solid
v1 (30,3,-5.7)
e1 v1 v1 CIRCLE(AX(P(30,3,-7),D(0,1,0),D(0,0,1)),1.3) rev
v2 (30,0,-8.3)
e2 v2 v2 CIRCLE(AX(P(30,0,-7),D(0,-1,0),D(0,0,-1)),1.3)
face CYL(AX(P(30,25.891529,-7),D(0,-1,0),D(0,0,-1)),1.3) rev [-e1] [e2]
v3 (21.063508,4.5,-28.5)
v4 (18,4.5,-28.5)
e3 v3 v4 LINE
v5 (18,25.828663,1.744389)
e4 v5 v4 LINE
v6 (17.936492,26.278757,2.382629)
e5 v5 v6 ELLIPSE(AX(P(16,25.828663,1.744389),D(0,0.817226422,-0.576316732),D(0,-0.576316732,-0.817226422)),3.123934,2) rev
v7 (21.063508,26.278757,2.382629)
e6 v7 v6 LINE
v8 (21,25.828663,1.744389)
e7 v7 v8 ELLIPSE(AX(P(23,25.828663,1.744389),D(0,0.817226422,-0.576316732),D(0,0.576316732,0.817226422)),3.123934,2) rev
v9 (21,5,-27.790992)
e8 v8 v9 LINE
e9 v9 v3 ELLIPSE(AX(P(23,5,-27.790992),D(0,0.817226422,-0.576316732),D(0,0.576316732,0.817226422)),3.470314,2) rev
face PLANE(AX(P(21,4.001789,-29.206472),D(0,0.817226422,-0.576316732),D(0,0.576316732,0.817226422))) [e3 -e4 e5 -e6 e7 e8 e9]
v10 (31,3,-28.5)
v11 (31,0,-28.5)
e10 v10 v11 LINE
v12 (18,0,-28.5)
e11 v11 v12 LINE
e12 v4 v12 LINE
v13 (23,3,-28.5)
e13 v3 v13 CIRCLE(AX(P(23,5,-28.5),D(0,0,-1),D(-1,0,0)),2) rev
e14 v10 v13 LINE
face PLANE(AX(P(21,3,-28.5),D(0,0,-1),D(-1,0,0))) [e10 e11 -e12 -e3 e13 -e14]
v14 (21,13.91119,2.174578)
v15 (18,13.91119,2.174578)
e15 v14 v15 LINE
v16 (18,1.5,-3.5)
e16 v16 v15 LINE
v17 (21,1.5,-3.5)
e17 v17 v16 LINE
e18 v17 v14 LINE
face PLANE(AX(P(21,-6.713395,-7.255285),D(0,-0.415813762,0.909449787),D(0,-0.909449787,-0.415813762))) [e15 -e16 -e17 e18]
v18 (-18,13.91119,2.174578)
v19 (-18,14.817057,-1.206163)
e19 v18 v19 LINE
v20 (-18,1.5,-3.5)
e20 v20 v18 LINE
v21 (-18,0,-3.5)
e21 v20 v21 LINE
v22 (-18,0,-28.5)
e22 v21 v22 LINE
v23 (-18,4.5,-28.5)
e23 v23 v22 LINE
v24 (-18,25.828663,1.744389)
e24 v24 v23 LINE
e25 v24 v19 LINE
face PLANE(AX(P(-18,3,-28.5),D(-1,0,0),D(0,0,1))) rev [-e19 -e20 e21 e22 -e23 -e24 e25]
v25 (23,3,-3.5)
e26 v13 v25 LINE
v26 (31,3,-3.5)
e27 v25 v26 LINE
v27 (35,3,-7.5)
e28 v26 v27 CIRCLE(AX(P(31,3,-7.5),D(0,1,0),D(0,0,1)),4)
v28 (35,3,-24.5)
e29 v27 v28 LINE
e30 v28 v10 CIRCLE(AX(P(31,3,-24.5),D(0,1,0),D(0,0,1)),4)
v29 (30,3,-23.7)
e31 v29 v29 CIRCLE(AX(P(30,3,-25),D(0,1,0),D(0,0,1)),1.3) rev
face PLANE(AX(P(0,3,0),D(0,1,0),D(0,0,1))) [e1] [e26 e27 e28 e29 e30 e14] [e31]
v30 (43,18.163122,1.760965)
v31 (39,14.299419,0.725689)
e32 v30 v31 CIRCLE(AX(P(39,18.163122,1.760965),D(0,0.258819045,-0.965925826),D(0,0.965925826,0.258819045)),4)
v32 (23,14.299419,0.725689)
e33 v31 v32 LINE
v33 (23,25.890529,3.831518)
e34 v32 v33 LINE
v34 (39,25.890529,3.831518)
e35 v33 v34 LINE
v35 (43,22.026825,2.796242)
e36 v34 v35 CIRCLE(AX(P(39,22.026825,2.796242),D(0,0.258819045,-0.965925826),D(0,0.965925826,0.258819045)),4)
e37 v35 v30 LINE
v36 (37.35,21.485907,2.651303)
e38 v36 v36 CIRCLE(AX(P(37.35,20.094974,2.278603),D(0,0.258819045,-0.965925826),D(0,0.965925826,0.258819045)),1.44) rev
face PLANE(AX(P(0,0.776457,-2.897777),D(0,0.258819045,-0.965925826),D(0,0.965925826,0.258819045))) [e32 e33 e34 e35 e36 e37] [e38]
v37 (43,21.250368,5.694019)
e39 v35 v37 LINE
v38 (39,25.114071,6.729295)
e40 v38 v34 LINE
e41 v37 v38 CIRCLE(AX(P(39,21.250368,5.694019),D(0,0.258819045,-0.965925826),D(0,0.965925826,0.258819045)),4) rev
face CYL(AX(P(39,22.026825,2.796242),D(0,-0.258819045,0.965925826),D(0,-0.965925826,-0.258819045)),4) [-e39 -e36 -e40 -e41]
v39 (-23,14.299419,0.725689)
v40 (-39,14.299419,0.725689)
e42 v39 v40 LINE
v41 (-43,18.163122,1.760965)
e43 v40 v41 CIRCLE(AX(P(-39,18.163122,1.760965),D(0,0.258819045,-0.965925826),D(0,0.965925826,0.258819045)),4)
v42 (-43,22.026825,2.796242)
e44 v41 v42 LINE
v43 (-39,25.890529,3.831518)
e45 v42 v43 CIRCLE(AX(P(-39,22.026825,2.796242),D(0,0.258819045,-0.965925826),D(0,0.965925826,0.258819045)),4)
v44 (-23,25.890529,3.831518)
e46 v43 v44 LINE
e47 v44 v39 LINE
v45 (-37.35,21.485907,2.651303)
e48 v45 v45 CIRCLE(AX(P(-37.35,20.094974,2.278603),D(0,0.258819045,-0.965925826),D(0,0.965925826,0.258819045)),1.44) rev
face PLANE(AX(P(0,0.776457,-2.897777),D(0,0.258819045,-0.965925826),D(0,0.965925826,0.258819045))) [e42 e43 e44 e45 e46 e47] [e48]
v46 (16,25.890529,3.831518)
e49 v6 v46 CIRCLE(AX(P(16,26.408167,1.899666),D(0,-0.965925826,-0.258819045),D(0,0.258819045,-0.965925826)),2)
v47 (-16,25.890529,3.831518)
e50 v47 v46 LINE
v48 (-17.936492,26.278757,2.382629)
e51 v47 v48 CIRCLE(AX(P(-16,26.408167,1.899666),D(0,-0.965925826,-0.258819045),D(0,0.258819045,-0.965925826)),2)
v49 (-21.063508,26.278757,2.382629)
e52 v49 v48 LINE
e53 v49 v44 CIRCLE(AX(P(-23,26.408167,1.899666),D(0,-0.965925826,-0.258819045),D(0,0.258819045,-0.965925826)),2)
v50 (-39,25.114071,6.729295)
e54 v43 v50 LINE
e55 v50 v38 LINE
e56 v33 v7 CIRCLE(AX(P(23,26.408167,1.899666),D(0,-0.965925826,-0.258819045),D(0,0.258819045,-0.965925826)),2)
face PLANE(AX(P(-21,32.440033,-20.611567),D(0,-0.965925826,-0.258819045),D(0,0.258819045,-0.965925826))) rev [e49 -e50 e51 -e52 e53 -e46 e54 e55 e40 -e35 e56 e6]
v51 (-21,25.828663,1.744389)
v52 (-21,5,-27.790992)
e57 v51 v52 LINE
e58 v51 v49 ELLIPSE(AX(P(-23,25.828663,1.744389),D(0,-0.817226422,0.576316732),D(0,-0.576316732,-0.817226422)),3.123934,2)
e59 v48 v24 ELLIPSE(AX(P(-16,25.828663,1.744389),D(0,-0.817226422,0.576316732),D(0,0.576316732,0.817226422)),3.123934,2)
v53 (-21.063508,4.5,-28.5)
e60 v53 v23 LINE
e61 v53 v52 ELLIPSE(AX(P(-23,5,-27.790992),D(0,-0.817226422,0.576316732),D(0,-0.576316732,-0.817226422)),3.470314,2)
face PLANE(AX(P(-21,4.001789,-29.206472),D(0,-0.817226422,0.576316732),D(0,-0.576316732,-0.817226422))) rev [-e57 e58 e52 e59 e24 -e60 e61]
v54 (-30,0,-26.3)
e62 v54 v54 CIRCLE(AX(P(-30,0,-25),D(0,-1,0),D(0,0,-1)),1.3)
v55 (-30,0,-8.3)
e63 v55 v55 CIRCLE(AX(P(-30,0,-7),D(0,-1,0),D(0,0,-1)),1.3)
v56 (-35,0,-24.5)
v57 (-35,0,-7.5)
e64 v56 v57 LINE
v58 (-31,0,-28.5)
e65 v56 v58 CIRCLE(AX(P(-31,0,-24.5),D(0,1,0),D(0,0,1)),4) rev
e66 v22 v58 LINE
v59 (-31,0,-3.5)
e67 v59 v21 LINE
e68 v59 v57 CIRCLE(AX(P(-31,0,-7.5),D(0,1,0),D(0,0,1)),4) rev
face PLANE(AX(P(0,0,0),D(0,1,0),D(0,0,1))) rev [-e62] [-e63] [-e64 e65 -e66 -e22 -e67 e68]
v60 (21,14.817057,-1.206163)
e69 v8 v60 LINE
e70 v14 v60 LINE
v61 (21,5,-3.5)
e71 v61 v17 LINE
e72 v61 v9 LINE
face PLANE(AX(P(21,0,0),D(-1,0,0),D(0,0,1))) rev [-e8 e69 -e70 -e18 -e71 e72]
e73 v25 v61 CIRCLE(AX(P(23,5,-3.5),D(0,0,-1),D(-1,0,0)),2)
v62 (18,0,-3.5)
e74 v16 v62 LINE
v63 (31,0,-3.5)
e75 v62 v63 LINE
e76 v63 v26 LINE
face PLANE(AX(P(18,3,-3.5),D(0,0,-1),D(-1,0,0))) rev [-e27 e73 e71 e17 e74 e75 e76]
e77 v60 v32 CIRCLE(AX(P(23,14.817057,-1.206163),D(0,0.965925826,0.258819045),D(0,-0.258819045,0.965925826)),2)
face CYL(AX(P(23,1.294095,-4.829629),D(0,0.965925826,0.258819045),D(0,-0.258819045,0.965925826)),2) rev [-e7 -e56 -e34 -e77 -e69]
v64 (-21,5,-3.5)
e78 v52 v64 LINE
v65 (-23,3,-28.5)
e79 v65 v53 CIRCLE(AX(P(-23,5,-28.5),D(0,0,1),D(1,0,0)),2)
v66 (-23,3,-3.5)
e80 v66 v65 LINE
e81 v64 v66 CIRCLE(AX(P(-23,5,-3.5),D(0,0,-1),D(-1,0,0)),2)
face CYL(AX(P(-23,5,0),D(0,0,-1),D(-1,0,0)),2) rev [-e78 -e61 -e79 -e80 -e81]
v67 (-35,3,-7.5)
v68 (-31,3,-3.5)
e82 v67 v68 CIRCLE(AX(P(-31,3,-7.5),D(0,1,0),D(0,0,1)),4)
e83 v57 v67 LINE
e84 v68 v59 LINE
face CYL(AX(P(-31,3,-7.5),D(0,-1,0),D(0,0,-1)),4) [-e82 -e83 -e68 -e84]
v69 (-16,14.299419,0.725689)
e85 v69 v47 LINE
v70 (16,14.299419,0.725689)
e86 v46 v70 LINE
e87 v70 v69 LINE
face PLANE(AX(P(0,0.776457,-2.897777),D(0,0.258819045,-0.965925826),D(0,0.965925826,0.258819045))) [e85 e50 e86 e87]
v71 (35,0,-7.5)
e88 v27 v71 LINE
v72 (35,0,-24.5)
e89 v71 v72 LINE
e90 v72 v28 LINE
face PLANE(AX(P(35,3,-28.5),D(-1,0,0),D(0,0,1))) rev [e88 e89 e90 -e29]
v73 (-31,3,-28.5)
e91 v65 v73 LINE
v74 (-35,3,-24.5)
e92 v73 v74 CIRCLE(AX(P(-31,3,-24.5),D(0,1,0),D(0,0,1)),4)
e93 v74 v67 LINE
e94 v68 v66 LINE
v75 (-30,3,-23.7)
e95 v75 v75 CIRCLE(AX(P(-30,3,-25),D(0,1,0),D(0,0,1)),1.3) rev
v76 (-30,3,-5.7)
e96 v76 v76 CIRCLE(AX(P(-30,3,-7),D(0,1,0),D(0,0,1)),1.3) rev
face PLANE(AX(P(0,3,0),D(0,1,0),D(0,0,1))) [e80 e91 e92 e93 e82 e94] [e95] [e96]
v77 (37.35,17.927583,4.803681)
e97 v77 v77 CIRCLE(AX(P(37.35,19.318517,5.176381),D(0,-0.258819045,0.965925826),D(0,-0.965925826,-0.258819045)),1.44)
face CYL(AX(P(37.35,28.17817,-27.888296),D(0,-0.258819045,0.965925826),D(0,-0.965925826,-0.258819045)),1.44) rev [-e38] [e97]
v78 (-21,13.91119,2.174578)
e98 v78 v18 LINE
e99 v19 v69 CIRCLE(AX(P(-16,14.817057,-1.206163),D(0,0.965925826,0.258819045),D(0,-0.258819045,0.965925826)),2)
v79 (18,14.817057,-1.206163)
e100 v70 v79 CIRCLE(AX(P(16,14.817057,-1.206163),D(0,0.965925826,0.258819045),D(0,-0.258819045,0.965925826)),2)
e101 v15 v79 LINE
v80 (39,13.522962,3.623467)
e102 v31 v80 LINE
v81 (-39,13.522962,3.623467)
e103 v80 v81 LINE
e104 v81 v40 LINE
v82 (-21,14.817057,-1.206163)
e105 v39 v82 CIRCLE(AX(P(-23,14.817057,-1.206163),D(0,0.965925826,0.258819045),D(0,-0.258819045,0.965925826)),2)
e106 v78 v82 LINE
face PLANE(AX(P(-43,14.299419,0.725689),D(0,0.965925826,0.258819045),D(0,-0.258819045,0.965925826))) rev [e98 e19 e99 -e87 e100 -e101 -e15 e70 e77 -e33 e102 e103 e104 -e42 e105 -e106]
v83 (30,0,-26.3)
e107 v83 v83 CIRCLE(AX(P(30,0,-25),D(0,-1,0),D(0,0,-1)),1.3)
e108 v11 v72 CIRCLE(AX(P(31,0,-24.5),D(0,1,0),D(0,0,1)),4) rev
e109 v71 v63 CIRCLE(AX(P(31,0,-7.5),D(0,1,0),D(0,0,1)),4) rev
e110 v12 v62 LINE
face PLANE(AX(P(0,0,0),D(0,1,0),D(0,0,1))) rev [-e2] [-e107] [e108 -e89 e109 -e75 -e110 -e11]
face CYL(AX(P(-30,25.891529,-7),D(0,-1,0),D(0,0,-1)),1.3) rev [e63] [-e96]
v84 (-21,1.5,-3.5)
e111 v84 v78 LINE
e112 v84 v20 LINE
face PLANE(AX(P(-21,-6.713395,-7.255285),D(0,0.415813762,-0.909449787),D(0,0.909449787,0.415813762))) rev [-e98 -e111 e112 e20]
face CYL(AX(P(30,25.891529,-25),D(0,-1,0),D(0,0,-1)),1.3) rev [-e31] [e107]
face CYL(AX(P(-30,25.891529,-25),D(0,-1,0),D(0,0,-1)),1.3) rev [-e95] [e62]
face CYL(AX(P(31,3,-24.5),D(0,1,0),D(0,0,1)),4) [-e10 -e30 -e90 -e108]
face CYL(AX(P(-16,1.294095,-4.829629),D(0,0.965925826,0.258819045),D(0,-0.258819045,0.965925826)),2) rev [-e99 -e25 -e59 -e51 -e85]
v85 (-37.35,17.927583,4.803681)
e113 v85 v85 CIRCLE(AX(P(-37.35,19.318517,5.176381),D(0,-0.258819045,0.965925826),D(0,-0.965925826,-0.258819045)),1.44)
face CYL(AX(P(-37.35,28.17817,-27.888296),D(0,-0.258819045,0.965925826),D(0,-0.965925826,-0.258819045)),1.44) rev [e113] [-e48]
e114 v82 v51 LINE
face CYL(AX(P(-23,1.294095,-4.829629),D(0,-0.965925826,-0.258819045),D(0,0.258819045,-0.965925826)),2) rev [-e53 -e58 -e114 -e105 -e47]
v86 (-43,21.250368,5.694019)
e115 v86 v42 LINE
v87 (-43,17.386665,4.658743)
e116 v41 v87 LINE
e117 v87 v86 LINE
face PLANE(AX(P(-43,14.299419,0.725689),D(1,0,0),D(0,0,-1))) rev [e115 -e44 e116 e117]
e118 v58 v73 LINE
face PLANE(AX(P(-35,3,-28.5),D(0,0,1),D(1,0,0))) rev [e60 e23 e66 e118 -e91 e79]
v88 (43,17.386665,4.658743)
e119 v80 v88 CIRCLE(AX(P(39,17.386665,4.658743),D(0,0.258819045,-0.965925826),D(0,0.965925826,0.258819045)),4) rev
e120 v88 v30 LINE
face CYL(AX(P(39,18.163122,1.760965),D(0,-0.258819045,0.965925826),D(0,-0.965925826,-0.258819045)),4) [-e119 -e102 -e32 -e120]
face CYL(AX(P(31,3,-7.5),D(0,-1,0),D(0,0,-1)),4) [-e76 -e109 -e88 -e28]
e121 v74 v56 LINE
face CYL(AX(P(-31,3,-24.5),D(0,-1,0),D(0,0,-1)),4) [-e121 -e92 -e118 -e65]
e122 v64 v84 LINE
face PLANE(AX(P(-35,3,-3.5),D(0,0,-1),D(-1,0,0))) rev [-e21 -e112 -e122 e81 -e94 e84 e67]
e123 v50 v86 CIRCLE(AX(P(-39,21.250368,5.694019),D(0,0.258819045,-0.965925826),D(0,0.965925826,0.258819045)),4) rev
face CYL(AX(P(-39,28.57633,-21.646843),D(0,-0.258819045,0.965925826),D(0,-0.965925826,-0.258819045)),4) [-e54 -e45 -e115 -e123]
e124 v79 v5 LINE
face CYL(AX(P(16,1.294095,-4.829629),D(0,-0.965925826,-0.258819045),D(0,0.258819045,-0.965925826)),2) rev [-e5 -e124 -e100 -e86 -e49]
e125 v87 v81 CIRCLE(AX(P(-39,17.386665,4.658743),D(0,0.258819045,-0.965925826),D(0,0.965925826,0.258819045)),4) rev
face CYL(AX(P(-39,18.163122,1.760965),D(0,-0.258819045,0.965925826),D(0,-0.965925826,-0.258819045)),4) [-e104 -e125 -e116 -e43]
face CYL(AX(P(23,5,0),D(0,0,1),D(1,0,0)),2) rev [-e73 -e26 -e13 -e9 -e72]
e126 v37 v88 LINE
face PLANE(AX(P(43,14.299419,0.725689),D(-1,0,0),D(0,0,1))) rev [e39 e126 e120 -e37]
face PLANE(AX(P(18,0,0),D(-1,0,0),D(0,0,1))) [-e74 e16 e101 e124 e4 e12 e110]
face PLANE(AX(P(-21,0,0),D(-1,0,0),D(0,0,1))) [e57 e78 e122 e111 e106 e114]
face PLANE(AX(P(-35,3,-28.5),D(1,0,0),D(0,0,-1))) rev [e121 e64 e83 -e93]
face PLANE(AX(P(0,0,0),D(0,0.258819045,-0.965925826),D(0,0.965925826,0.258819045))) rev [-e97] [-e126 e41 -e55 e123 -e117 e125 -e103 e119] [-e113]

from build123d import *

# Parameters (mm, degrees)
SKETCH1_W             = 17
SKETCH1_H             = 25
BOSS_EXTRUDE1_DEPTH   = 3
BOSS_EXTRUDE1_2_DEPTH = 3
SKETCH2_W             = 86
SKETCH2_H             = 12
BOSS_EXTRUDE2_DEPTH   = 3
SKETCH3_R             = 1.3
CUT_EXTRUDE1_DEPTH    = 3
SKETCH4_R             = 1.44
CUT_EXTRUDE2_DEPTH    = 3
BOSS_EXTRUDE3_START   = 18
BOSS_EXTRUDE3_DEPTH   = 3
BOSS_EXTRUDE4_START   = -18
BOSS_EXTRUDE4_DEPTH   = 3
FILLET1_R             = 2
FILLET2_R             = 4


with BuildPart() as part:
    # Sketch1 → Boss-Extrude1 (new body)
    with BuildSketch(Plane(origin=(0, 0, 0), x_dir=(1, 0, 0), z_dir=(0, 1, 0))):
        with Locations((-26.5, 16)):
            Rectangle(SKETCH1_W, SKETCH1_H)
    extrude(amount=BOSS_EXTRUDE1_DEPTH)


with BuildPart() as body_2:
    # Sketch1 → Boss-Extrude1 2 (new body)
    with BuildSketch(Plane(origin=(0, 0, 0), x_dir=(1, 0, 0), z_dir=(0, 1, 0))):
        with Locations((26.5, 16)):
            Rectangle(SKETCH1_W, SKETCH1_H)
    extrude(amount=BOSS_EXTRUDE1_2_DEPTH)


with BuildPart() as body_3:
    # Sketch2 → Boss-Extrude2 (new body)
    with BuildSketch(Plane(origin=(0, 0, 0), x_dir=(1, 0, 0), z_dir=(0, 0.2588190451025247, -0.9659258262890672))):
        with Locations((0, -20)):
            Rectangle(SKETCH2_W, SKETCH2_H)
    extrude(amount=BOSS_EXTRUDE2_DEPTH)

    # Sketch4 → Cut-Extrude2 (cut)
    with BuildSketch(Plane(origin=(0, 0, 0), x_dir=(1, 0, 0), z_dir=(0, -0.25881904510252474, 0.9659258262890673))):
        with Locations(Location((-37.35, 20, 0), (0, 0, 270))):
            Circle(SKETCH4_R)
        with Locations(Location((37.35, 20, 0), (0, 0, 270))):
            Circle(SKETCH4_R)
    extrude(amount=-CUT_EXTRUDE2_DEPTH, mode=Mode.SUBTRACT)


with BuildPart() as cut_extrude1_tool:
    # Sketch3 → Cut-Extrude1 (new body)
    with BuildSketch(Plane.XZ):
        with Locations(Location((30, -25, 0), (0, 0, 270))):
            Circle(SKETCH3_R)
        with Locations(Location((30, -7, 0), (0, 0, 270))):
            Circle(SKETCH3_R)
        with Locations(Location((-30, -25, 0), (0, 0, 270))):
            Circle(SKETCH3_R)
        with Locations(Location((-30, -7, 0), (0, 0, 270))):
            Circle(SKETCH3_R)
    extrude(amount=-CUT_EXTRUDE1_DEPTH)


with BuildPart() as part_1:
    add(part.part)

    # Cut-Extrude1: cut by cut_extrude1_tool
    add(cut_extrude1_tool.part, mode=Mode.SUBTRACT)



with BuildPart() as body_2_1:
    add(body_2.part)

    # Cut-Extrude1: cut by cut_extrude1_tool
    add(cut_extrude1_tool.part, mode=Mode.SUBTRACT)


    add(body_3.part)  # Boss-Extrude3 merges body 3
    # Sketch5 → Boss-Extrude3 (add)
    with BuildSketch(Plane(origin=(0, 0, 0), x_dir=(0, 0, -1), z_dir=(1, 0, 0)).offset(BOSS_EXTRUDE3_START)):
        Polygon((3.5, 3), (28.5, 3), (28.5, 4.5), (-2.382628954, 26.278757186), (-3.831517694, 25.890528619), (-0.725689153, 14.299418703), (-2.174577892, 13.911190136), (3.5, 1.5), align=None)
    extrude(amount=BOSS_EXTRUDE3_DEPTH)


with BuildPart() as part_2:
    add(part_1.part)

    add(body_2_1.part)  # Boss-Extrude4 merges body 2
    # Sketch5<2> → Boss-Extrude4 (add)
    with BuildSketch(Plane(origin=(0, 0, 0), x_dir=(0, 0, -1), z_dir=(1, 0, 0)).offset(BOSS_EXTRUDE4_START)):
        Polygon((3.5, 3), (28.5, 3), (28.5, 4.5), (-2.382628954, 26.278757186), (-3.831517694, 25.890528619), (-0.725689153, 14.299418703), (-2.174577892, 13.911190136), (3.5, 1.5), align=None)
    extrude(amount=-BOSS_EXTRUDE4_DEPTH)

    # Fillet1
    # the kernel refuses this fillet: 2 mm, written as the material it adds along each edge
    with BuildSketch(Plane(origin=(-21, 3, -3.5), x_dir=(0, 1, 0), z_dir=(0, 0, -1))) as fillet1_piece_1_section:
        with BuildLine():
            CenterArc((FILLET1_R, -FILLET1_R), FILLET1_R, 90, 90)
            Line((0, -FILLET1_R), (0, 0))
            Line((0, 0), (FILLET1_R, 0))
        make_face()
    fillet1_piece_1 = extrude(amount=25, mode=Mode.PRIVATE)
    fillet1_piece_1 = split(fillet1_piece_1, bisect_by=Plane(origin=(-21.452953813, 10.041317551, -20.642322338), z_dir=(0, -0.8172264215847361, 0.5763167322434836)), keep=Keep.TOP, mode=Mode.PRIVATE)
    add(fillet1_piece_1)
    with BuildSketch(Plane(origin=(21, 3, -3.5), x_dir=(0, 1, 0), z_dir=(0, 0, -1))) as fillet1_piece_2_section:
        with BuildLine():
            CenterArc((FILLET1_R, FILLET1_R), FILLET1_R, 180, 90)
            Line((0, FILLET1_R), (0, 0))
            Line((0, 0), (FILLET1_R, 0))
        make_face()
    fillet1_piece_2 = extrude(amount=25, mode=Mode.PRIVATE)
    fillet1_piece_2 = split(fillet1_piece_2, bisect_by=Plane(origin=(21.452953813, 10.041317551, -20.642322338), z_dir=(0, -0.8172264215847361, 0.5763167322434836)), keep=Keep.TOP, mode=Mode.PRIVATE)
    add(fillet1_piece_2)
    with BuildSketch(Plane(origin=(-18, 25.890528619, 3.831517694), x_dir=(1, 0, 0), z_dir=(0, -0.9659258262890673, -0.2588190451025247))) as fillet1_piece_3_section:
        with BuildLine():
            CenterArc((FILLET1_R, -FILLET1_R), FILLET1_R, 90, 90)
            Line((0, -FILLET1_R), (0, 0))
            Line((0, 0), (FILLET1_R, 0))
        make_face()
    fillet1_piece_3 = extrude(amount=12, mode=Mode.PRIVATE)
    fillet1_piece_3 = split(fillet1_piece_3, bisect_by=Plane(origin=(-17.546921316, 24.007524822, -0.83801517), z_dir=(0, -0.8172264215847361, 0.5763167322434836)), keep=Keep.TOP, mode=Mode.PRIVATE)
    add(fillet1_piece_3)
    with BuildSketch(Plane(origin=(-21, 25.890528619, 3.831517694), x_dir=(0, 0.2588190451025247, -0.9659258262890672), z_dir=(0, -0.9659258262890673, -0.2588190451025247))) as fillet1_piece_4_section:
        with BuildLine():
            CenterArc((FILLET1_R, -FILLET1_R), FILLET1_R, 90, 90)
            Line((0, -FILLET1_R), (0, 0))
            Line((0, 0), (FILLET1_R, 0))
        make_face()
    fillet1_piece_4 = extrude(amount=12, mode=Mode.PRIVATE)
    fillet1_piece_4 = split(fillet1_piece_4, bisect_by=Plane(origin=(-21.453078684, 24.007524822, -0.838015171), z_dir=(0, -0.8172264215847361, 0.5763167322434836)), keep=Keep.TOP, mode=Mode.PRIVATE)
    add(fillet1_piece_4)
    with BuildSketch(Plane(origin=(21, 25.890528619, 3.831517694), x_dir=(1, 0, 0), z_dir=(0, -0.9659258262890673, -0.2588190451025247))) as fillet1_piece_5_section:
        with BuildLine():
            CenterArc((FILLET1_R, -FILLET1_R), FILLET1_R, 90, 90)
            Line((0, -FILLET1_R), (0, 0))
            Line((0, 0), (FILLET1_R, 0))
        make_face()
    fillet1_piece_5 = extrude(amount=12, mode=Mode.PRIVATE)
    fillet1_piece_5 = split(fillet1_piece_5, bisect_by=Plane(origin=(21.453078684, 24.007524822, -0.83801517), z_dir=(0, -0.8172264215847361, 0.5763167322434836)), keep=Keep.TOP, mode=Mode.PRIVATE)
    add(fillet1_piece_5)
    with BuildSketch(Plane(origin=(18, 25.890528619, 3.831517694), x_dir=(-1.776356839400251e-15, 0.25881904510252474, -0.9659258262890673), z_dir=(0, -0.9659258262890673, -0.2588190451025247))) as fillet1_piece_6_section:
        with BuildLine():
            CenterArc((FILLET1_R, -FILLET1_R), FILLET1_R, 90, 90)
            Line((0, -FILLET1_R), (0, 0))
            Line((0, 0), (FILLET1_R, 0))
        make_face()
    fillet1_piece_6 = extrude(amount=12, mode=Mode.PRIVATE)
    fillet1_piece_6 = split(fillet1_piece_6, bisect_by=Plane(origin=(17.546921316, 24.007524822, -0.838015171), z_dir=(0, -0.8172264215847361, 0.5763167322434836)), keep=Keep.TOP, mode=Mode.PRIVATE)
    add(fillet1_piece_6)

    # Fillet2
    fillet2_edges = [part_2.edges().sort_by_distance(p)[0] for p in [
        (43, 13.911190136, 2.174577892),
        (-43, 13.911190136, 2.174577892),
        (-43, 25.502300051, 5.280406433),
        (43, 25.502300051, 5.280406433),
        (35, 1.5, -28.5),
        (35, 1.5, -3.5),
        (-35, 1.5, -28.5),
        (-35, 1.5, -3.5),
    ]]
    fillet(fillet2_edges, radius=FILLET2_R)


solid = part_2.part
